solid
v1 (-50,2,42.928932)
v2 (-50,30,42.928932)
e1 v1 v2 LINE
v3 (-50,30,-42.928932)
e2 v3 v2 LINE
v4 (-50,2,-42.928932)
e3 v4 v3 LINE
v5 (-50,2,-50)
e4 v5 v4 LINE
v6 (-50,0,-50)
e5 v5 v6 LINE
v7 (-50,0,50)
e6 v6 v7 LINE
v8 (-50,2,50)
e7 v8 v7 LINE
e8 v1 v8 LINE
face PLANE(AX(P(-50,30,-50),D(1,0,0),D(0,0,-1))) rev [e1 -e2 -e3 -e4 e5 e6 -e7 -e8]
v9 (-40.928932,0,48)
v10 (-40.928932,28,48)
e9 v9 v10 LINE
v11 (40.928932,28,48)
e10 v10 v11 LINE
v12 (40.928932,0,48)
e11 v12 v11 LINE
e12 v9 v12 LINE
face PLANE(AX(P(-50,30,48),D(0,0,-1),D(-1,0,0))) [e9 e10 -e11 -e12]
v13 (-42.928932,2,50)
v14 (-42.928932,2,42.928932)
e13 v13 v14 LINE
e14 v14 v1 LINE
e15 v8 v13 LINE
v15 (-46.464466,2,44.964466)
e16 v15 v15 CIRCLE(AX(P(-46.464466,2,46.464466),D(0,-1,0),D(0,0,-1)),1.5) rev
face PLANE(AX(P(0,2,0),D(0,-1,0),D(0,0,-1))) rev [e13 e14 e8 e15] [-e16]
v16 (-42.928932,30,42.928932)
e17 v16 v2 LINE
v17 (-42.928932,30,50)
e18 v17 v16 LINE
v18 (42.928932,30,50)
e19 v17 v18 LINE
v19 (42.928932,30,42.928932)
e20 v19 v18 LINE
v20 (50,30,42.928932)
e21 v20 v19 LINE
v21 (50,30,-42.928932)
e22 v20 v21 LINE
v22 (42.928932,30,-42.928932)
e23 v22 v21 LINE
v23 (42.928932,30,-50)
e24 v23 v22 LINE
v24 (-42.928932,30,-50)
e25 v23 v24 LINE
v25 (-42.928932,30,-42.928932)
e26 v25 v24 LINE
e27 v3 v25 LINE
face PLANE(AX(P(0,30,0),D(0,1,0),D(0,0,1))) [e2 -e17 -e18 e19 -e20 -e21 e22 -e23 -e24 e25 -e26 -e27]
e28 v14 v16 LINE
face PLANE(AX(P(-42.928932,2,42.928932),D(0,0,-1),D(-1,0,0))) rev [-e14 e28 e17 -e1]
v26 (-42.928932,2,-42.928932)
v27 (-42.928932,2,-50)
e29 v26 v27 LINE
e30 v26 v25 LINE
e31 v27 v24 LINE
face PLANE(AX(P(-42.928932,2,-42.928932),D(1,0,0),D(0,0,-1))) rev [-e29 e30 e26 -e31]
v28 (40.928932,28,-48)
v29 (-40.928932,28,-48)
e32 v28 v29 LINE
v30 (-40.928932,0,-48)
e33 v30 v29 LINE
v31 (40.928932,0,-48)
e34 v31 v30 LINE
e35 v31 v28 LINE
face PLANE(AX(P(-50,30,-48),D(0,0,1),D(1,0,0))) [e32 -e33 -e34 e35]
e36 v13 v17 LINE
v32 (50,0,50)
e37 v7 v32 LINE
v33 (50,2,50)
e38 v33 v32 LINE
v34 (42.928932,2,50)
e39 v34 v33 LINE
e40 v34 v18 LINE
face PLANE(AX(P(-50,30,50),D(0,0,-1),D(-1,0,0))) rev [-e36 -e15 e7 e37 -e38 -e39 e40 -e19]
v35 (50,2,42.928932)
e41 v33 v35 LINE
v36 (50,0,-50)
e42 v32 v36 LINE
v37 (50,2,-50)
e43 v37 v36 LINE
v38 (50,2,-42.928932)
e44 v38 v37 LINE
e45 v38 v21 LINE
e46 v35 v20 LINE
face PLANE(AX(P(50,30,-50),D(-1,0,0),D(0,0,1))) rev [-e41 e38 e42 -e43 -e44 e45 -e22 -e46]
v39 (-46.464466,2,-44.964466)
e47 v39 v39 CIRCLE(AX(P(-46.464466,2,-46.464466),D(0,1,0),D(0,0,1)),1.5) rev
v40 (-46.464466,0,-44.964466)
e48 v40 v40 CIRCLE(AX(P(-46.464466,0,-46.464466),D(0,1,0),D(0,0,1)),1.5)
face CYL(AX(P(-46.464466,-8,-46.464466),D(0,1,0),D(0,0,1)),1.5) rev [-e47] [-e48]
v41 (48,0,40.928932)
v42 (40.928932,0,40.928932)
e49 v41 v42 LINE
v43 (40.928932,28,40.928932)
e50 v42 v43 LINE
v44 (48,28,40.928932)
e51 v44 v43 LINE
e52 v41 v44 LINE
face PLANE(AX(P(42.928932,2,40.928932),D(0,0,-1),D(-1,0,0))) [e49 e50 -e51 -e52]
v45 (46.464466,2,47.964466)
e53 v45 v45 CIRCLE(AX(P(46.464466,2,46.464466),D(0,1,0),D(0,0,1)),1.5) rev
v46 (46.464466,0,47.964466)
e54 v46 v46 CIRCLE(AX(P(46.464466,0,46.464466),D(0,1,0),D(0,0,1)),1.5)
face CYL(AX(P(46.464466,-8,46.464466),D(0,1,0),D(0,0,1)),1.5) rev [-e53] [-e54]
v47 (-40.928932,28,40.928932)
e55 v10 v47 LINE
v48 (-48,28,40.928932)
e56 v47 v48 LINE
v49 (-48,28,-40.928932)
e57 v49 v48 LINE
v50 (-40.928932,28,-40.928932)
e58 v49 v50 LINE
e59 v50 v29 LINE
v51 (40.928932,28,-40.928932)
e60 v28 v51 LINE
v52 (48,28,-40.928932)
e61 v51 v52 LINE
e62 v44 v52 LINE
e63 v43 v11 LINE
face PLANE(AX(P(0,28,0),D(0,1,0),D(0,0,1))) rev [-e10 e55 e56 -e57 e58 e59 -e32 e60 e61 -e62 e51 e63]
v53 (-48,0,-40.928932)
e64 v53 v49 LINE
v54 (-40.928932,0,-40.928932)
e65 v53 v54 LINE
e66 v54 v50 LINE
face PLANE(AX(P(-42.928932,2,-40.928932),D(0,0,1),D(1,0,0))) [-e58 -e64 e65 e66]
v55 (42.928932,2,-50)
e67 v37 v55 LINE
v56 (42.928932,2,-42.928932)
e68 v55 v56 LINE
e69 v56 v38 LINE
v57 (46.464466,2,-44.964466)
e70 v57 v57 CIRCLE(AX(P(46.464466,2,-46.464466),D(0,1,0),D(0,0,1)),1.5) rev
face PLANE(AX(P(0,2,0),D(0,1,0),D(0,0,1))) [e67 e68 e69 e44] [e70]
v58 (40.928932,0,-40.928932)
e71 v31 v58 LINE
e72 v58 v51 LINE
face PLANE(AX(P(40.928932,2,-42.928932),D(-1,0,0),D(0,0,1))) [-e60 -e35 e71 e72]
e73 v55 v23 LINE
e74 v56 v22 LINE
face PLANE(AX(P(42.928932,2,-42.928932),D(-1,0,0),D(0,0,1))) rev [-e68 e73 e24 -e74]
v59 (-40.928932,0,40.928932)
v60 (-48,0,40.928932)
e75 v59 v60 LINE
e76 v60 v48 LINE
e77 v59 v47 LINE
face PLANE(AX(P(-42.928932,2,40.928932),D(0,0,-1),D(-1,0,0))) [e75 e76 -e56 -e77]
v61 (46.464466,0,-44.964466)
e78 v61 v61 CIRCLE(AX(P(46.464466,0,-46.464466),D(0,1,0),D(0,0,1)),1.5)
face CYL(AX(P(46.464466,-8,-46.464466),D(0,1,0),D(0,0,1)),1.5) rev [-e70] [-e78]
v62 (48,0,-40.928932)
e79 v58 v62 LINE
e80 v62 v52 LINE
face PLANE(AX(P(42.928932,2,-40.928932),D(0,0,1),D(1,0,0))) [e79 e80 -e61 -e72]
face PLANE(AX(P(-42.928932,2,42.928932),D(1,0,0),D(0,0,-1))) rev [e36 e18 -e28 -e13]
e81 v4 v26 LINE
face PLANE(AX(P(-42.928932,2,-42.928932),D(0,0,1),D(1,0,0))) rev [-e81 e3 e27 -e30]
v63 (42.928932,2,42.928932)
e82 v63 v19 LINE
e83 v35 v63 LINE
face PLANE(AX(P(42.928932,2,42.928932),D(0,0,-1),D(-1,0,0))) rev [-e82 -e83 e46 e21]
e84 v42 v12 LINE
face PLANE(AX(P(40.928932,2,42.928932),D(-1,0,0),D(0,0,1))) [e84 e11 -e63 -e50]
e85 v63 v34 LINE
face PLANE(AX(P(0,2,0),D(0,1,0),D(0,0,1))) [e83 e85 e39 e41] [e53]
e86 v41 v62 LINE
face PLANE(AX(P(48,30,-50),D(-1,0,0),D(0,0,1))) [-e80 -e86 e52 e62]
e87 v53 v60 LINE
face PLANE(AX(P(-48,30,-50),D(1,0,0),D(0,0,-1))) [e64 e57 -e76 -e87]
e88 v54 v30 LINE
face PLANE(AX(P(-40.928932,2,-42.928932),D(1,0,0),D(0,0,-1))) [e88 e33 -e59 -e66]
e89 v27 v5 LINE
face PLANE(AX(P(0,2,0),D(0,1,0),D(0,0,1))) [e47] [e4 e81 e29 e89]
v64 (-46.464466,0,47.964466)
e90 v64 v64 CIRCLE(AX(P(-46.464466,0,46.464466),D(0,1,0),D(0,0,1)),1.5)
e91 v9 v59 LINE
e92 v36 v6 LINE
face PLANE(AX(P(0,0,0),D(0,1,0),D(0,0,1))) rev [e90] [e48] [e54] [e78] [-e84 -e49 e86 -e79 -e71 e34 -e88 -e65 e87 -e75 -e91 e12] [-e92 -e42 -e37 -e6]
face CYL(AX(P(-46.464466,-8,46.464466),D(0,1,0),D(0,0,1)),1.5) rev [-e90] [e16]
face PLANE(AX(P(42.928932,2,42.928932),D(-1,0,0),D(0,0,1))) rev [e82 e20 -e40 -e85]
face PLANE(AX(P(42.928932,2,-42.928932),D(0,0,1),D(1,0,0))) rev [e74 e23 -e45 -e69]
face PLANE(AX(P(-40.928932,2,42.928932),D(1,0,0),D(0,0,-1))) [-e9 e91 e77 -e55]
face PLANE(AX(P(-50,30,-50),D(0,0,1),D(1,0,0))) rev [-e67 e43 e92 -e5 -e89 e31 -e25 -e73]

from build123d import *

# Parameters (mm, degrees)
CROQUIS1_W              = 100
CROQUIS1_H              = 100
SALIENTE_EXTRUIR1_DEPTH = 30
CROQUIS2_R              = 1.5
CORTAR_EXTRUIR1_DEPTH   = 38
CROQUIS3_W              = 7.071067812
CROQUIS3_H              = 7.071067812
CORTAR_EXTRUIR2_DEPTH   = 28
VACIADO1_START          = -48
VACIADO1_OUTLINE_W      = 28
VACIADO1_OUTLINE_H      = 81.857864376
VACIADO1_DEPTH          = 96
VACIADO1_START_2        = -40.928932188
VACIADO1_2_OUTLINE_W    = 28
VACIADO1_2_OUTLINE_H    = 7.071067812
VACIADO1_2_DEPTH        = 81.857864376


# Read off the part's stored shape, not the designer's step: Vaciado1
with BuildPart() as part:
    # Croquis1 → Saliente-Extruir1 (new body)
    with BuildSketch(Plane(origin=(0, 0, 0), x_dir=(1, 0, 0), z_dir=(0, 1, 0))):
        Rectangle(CROQUIS1_W, CROQUIS1_H)
    extrude(amount=SALIENTE_EXTRUIR1_DEPTH)

    # Croquis2 → Cortar-Extruir1 (cut)
    with BuildSketch(Plane(origin=(0, 30, 0), x_dir=(1, 0, 0), z_dir=(0, 1, 0))):
        with Locations(Location((-46.464466094, -46.464466094, 0), (0, 0, 270))):
            Circle(CROQUIS2_R)
        with Locations(Location((-46.464466094, 46.464466094, 0), (0, 0, 270))):
            Circle(CROQUIS2_R)
        with Locations(Location((46.464466094, 46.464466094, 0), (0, 0, 270))):
            Circle(CROQUIS2_R)
        with Locations(Location((46.464466094, -46.464466094, 0), (0, 0, 270))):
            Circle(CROQUIS2_R)
    extrude(amount=-CORTAR_EXTRUIR1_DEPTH, mode=Mode.SUBTRACT)

    # Croquis3 → Cortar-Extruir2 (cut)
    with BuildSketch(Plane(origin=(0, 30, 0), x_dir=(1, 0, 0), z_dir=(0, 1, 0))):
        with Locations((-46.464466094, -46.464466094)):
            Rectangle(CROQUIS3_W, CROQUIS3_H)
        with Locations((-46.464466094, 46.464466094)):
            Rectangle(CROQUIS3_W, CROQUIS3_H)
        with Locations((46.464466094, 46.464466094)):
            Rectangle(CROQUIS3_W, CROQUIS3_H)
        with Locations((46.464466094, -46.464466094)):
            Rectangle(CROQUIS3_W, CROQUIS3_H)
    extrude(amount=-CORTAR_EXTRUIR2_DEPTH, mode=Mode.SUBTRACT)

    # Vaciado1 outline → Vaciado1 (cut)
    with BuildSketch(Plane.YZ.offset(VACIADO1_START)):
        with Locations((14, 0)):
            Rectangle(VACIADO1_OUTLINE_W, VACIADO1_OUTLINE_H)
    extrude(amount=VACIADO1_DEPTH, mode=Mode.SUBTRACT)

    # Vaciado1 2 outline → Vaciado1 2 (cut)
    with BuildSketch(Plane.YZ.offset(VACIADO1_START_2)):
        with Locations((14, -44.464466094)):
            Rectangle(VACIADO1_2_OUTLINE_W, VACIADO1_2_OUTLINE_H)
        with Locations((14, 44.464466094)):
            Rectangle(VACIADO1_2_OUTLINE_W, VACIADO1_2_OUTLINE_H)
    extrude(amount=VACIADO1_2_DEPTH, mode=Mode.SUBTRACT)


solid = part.part
